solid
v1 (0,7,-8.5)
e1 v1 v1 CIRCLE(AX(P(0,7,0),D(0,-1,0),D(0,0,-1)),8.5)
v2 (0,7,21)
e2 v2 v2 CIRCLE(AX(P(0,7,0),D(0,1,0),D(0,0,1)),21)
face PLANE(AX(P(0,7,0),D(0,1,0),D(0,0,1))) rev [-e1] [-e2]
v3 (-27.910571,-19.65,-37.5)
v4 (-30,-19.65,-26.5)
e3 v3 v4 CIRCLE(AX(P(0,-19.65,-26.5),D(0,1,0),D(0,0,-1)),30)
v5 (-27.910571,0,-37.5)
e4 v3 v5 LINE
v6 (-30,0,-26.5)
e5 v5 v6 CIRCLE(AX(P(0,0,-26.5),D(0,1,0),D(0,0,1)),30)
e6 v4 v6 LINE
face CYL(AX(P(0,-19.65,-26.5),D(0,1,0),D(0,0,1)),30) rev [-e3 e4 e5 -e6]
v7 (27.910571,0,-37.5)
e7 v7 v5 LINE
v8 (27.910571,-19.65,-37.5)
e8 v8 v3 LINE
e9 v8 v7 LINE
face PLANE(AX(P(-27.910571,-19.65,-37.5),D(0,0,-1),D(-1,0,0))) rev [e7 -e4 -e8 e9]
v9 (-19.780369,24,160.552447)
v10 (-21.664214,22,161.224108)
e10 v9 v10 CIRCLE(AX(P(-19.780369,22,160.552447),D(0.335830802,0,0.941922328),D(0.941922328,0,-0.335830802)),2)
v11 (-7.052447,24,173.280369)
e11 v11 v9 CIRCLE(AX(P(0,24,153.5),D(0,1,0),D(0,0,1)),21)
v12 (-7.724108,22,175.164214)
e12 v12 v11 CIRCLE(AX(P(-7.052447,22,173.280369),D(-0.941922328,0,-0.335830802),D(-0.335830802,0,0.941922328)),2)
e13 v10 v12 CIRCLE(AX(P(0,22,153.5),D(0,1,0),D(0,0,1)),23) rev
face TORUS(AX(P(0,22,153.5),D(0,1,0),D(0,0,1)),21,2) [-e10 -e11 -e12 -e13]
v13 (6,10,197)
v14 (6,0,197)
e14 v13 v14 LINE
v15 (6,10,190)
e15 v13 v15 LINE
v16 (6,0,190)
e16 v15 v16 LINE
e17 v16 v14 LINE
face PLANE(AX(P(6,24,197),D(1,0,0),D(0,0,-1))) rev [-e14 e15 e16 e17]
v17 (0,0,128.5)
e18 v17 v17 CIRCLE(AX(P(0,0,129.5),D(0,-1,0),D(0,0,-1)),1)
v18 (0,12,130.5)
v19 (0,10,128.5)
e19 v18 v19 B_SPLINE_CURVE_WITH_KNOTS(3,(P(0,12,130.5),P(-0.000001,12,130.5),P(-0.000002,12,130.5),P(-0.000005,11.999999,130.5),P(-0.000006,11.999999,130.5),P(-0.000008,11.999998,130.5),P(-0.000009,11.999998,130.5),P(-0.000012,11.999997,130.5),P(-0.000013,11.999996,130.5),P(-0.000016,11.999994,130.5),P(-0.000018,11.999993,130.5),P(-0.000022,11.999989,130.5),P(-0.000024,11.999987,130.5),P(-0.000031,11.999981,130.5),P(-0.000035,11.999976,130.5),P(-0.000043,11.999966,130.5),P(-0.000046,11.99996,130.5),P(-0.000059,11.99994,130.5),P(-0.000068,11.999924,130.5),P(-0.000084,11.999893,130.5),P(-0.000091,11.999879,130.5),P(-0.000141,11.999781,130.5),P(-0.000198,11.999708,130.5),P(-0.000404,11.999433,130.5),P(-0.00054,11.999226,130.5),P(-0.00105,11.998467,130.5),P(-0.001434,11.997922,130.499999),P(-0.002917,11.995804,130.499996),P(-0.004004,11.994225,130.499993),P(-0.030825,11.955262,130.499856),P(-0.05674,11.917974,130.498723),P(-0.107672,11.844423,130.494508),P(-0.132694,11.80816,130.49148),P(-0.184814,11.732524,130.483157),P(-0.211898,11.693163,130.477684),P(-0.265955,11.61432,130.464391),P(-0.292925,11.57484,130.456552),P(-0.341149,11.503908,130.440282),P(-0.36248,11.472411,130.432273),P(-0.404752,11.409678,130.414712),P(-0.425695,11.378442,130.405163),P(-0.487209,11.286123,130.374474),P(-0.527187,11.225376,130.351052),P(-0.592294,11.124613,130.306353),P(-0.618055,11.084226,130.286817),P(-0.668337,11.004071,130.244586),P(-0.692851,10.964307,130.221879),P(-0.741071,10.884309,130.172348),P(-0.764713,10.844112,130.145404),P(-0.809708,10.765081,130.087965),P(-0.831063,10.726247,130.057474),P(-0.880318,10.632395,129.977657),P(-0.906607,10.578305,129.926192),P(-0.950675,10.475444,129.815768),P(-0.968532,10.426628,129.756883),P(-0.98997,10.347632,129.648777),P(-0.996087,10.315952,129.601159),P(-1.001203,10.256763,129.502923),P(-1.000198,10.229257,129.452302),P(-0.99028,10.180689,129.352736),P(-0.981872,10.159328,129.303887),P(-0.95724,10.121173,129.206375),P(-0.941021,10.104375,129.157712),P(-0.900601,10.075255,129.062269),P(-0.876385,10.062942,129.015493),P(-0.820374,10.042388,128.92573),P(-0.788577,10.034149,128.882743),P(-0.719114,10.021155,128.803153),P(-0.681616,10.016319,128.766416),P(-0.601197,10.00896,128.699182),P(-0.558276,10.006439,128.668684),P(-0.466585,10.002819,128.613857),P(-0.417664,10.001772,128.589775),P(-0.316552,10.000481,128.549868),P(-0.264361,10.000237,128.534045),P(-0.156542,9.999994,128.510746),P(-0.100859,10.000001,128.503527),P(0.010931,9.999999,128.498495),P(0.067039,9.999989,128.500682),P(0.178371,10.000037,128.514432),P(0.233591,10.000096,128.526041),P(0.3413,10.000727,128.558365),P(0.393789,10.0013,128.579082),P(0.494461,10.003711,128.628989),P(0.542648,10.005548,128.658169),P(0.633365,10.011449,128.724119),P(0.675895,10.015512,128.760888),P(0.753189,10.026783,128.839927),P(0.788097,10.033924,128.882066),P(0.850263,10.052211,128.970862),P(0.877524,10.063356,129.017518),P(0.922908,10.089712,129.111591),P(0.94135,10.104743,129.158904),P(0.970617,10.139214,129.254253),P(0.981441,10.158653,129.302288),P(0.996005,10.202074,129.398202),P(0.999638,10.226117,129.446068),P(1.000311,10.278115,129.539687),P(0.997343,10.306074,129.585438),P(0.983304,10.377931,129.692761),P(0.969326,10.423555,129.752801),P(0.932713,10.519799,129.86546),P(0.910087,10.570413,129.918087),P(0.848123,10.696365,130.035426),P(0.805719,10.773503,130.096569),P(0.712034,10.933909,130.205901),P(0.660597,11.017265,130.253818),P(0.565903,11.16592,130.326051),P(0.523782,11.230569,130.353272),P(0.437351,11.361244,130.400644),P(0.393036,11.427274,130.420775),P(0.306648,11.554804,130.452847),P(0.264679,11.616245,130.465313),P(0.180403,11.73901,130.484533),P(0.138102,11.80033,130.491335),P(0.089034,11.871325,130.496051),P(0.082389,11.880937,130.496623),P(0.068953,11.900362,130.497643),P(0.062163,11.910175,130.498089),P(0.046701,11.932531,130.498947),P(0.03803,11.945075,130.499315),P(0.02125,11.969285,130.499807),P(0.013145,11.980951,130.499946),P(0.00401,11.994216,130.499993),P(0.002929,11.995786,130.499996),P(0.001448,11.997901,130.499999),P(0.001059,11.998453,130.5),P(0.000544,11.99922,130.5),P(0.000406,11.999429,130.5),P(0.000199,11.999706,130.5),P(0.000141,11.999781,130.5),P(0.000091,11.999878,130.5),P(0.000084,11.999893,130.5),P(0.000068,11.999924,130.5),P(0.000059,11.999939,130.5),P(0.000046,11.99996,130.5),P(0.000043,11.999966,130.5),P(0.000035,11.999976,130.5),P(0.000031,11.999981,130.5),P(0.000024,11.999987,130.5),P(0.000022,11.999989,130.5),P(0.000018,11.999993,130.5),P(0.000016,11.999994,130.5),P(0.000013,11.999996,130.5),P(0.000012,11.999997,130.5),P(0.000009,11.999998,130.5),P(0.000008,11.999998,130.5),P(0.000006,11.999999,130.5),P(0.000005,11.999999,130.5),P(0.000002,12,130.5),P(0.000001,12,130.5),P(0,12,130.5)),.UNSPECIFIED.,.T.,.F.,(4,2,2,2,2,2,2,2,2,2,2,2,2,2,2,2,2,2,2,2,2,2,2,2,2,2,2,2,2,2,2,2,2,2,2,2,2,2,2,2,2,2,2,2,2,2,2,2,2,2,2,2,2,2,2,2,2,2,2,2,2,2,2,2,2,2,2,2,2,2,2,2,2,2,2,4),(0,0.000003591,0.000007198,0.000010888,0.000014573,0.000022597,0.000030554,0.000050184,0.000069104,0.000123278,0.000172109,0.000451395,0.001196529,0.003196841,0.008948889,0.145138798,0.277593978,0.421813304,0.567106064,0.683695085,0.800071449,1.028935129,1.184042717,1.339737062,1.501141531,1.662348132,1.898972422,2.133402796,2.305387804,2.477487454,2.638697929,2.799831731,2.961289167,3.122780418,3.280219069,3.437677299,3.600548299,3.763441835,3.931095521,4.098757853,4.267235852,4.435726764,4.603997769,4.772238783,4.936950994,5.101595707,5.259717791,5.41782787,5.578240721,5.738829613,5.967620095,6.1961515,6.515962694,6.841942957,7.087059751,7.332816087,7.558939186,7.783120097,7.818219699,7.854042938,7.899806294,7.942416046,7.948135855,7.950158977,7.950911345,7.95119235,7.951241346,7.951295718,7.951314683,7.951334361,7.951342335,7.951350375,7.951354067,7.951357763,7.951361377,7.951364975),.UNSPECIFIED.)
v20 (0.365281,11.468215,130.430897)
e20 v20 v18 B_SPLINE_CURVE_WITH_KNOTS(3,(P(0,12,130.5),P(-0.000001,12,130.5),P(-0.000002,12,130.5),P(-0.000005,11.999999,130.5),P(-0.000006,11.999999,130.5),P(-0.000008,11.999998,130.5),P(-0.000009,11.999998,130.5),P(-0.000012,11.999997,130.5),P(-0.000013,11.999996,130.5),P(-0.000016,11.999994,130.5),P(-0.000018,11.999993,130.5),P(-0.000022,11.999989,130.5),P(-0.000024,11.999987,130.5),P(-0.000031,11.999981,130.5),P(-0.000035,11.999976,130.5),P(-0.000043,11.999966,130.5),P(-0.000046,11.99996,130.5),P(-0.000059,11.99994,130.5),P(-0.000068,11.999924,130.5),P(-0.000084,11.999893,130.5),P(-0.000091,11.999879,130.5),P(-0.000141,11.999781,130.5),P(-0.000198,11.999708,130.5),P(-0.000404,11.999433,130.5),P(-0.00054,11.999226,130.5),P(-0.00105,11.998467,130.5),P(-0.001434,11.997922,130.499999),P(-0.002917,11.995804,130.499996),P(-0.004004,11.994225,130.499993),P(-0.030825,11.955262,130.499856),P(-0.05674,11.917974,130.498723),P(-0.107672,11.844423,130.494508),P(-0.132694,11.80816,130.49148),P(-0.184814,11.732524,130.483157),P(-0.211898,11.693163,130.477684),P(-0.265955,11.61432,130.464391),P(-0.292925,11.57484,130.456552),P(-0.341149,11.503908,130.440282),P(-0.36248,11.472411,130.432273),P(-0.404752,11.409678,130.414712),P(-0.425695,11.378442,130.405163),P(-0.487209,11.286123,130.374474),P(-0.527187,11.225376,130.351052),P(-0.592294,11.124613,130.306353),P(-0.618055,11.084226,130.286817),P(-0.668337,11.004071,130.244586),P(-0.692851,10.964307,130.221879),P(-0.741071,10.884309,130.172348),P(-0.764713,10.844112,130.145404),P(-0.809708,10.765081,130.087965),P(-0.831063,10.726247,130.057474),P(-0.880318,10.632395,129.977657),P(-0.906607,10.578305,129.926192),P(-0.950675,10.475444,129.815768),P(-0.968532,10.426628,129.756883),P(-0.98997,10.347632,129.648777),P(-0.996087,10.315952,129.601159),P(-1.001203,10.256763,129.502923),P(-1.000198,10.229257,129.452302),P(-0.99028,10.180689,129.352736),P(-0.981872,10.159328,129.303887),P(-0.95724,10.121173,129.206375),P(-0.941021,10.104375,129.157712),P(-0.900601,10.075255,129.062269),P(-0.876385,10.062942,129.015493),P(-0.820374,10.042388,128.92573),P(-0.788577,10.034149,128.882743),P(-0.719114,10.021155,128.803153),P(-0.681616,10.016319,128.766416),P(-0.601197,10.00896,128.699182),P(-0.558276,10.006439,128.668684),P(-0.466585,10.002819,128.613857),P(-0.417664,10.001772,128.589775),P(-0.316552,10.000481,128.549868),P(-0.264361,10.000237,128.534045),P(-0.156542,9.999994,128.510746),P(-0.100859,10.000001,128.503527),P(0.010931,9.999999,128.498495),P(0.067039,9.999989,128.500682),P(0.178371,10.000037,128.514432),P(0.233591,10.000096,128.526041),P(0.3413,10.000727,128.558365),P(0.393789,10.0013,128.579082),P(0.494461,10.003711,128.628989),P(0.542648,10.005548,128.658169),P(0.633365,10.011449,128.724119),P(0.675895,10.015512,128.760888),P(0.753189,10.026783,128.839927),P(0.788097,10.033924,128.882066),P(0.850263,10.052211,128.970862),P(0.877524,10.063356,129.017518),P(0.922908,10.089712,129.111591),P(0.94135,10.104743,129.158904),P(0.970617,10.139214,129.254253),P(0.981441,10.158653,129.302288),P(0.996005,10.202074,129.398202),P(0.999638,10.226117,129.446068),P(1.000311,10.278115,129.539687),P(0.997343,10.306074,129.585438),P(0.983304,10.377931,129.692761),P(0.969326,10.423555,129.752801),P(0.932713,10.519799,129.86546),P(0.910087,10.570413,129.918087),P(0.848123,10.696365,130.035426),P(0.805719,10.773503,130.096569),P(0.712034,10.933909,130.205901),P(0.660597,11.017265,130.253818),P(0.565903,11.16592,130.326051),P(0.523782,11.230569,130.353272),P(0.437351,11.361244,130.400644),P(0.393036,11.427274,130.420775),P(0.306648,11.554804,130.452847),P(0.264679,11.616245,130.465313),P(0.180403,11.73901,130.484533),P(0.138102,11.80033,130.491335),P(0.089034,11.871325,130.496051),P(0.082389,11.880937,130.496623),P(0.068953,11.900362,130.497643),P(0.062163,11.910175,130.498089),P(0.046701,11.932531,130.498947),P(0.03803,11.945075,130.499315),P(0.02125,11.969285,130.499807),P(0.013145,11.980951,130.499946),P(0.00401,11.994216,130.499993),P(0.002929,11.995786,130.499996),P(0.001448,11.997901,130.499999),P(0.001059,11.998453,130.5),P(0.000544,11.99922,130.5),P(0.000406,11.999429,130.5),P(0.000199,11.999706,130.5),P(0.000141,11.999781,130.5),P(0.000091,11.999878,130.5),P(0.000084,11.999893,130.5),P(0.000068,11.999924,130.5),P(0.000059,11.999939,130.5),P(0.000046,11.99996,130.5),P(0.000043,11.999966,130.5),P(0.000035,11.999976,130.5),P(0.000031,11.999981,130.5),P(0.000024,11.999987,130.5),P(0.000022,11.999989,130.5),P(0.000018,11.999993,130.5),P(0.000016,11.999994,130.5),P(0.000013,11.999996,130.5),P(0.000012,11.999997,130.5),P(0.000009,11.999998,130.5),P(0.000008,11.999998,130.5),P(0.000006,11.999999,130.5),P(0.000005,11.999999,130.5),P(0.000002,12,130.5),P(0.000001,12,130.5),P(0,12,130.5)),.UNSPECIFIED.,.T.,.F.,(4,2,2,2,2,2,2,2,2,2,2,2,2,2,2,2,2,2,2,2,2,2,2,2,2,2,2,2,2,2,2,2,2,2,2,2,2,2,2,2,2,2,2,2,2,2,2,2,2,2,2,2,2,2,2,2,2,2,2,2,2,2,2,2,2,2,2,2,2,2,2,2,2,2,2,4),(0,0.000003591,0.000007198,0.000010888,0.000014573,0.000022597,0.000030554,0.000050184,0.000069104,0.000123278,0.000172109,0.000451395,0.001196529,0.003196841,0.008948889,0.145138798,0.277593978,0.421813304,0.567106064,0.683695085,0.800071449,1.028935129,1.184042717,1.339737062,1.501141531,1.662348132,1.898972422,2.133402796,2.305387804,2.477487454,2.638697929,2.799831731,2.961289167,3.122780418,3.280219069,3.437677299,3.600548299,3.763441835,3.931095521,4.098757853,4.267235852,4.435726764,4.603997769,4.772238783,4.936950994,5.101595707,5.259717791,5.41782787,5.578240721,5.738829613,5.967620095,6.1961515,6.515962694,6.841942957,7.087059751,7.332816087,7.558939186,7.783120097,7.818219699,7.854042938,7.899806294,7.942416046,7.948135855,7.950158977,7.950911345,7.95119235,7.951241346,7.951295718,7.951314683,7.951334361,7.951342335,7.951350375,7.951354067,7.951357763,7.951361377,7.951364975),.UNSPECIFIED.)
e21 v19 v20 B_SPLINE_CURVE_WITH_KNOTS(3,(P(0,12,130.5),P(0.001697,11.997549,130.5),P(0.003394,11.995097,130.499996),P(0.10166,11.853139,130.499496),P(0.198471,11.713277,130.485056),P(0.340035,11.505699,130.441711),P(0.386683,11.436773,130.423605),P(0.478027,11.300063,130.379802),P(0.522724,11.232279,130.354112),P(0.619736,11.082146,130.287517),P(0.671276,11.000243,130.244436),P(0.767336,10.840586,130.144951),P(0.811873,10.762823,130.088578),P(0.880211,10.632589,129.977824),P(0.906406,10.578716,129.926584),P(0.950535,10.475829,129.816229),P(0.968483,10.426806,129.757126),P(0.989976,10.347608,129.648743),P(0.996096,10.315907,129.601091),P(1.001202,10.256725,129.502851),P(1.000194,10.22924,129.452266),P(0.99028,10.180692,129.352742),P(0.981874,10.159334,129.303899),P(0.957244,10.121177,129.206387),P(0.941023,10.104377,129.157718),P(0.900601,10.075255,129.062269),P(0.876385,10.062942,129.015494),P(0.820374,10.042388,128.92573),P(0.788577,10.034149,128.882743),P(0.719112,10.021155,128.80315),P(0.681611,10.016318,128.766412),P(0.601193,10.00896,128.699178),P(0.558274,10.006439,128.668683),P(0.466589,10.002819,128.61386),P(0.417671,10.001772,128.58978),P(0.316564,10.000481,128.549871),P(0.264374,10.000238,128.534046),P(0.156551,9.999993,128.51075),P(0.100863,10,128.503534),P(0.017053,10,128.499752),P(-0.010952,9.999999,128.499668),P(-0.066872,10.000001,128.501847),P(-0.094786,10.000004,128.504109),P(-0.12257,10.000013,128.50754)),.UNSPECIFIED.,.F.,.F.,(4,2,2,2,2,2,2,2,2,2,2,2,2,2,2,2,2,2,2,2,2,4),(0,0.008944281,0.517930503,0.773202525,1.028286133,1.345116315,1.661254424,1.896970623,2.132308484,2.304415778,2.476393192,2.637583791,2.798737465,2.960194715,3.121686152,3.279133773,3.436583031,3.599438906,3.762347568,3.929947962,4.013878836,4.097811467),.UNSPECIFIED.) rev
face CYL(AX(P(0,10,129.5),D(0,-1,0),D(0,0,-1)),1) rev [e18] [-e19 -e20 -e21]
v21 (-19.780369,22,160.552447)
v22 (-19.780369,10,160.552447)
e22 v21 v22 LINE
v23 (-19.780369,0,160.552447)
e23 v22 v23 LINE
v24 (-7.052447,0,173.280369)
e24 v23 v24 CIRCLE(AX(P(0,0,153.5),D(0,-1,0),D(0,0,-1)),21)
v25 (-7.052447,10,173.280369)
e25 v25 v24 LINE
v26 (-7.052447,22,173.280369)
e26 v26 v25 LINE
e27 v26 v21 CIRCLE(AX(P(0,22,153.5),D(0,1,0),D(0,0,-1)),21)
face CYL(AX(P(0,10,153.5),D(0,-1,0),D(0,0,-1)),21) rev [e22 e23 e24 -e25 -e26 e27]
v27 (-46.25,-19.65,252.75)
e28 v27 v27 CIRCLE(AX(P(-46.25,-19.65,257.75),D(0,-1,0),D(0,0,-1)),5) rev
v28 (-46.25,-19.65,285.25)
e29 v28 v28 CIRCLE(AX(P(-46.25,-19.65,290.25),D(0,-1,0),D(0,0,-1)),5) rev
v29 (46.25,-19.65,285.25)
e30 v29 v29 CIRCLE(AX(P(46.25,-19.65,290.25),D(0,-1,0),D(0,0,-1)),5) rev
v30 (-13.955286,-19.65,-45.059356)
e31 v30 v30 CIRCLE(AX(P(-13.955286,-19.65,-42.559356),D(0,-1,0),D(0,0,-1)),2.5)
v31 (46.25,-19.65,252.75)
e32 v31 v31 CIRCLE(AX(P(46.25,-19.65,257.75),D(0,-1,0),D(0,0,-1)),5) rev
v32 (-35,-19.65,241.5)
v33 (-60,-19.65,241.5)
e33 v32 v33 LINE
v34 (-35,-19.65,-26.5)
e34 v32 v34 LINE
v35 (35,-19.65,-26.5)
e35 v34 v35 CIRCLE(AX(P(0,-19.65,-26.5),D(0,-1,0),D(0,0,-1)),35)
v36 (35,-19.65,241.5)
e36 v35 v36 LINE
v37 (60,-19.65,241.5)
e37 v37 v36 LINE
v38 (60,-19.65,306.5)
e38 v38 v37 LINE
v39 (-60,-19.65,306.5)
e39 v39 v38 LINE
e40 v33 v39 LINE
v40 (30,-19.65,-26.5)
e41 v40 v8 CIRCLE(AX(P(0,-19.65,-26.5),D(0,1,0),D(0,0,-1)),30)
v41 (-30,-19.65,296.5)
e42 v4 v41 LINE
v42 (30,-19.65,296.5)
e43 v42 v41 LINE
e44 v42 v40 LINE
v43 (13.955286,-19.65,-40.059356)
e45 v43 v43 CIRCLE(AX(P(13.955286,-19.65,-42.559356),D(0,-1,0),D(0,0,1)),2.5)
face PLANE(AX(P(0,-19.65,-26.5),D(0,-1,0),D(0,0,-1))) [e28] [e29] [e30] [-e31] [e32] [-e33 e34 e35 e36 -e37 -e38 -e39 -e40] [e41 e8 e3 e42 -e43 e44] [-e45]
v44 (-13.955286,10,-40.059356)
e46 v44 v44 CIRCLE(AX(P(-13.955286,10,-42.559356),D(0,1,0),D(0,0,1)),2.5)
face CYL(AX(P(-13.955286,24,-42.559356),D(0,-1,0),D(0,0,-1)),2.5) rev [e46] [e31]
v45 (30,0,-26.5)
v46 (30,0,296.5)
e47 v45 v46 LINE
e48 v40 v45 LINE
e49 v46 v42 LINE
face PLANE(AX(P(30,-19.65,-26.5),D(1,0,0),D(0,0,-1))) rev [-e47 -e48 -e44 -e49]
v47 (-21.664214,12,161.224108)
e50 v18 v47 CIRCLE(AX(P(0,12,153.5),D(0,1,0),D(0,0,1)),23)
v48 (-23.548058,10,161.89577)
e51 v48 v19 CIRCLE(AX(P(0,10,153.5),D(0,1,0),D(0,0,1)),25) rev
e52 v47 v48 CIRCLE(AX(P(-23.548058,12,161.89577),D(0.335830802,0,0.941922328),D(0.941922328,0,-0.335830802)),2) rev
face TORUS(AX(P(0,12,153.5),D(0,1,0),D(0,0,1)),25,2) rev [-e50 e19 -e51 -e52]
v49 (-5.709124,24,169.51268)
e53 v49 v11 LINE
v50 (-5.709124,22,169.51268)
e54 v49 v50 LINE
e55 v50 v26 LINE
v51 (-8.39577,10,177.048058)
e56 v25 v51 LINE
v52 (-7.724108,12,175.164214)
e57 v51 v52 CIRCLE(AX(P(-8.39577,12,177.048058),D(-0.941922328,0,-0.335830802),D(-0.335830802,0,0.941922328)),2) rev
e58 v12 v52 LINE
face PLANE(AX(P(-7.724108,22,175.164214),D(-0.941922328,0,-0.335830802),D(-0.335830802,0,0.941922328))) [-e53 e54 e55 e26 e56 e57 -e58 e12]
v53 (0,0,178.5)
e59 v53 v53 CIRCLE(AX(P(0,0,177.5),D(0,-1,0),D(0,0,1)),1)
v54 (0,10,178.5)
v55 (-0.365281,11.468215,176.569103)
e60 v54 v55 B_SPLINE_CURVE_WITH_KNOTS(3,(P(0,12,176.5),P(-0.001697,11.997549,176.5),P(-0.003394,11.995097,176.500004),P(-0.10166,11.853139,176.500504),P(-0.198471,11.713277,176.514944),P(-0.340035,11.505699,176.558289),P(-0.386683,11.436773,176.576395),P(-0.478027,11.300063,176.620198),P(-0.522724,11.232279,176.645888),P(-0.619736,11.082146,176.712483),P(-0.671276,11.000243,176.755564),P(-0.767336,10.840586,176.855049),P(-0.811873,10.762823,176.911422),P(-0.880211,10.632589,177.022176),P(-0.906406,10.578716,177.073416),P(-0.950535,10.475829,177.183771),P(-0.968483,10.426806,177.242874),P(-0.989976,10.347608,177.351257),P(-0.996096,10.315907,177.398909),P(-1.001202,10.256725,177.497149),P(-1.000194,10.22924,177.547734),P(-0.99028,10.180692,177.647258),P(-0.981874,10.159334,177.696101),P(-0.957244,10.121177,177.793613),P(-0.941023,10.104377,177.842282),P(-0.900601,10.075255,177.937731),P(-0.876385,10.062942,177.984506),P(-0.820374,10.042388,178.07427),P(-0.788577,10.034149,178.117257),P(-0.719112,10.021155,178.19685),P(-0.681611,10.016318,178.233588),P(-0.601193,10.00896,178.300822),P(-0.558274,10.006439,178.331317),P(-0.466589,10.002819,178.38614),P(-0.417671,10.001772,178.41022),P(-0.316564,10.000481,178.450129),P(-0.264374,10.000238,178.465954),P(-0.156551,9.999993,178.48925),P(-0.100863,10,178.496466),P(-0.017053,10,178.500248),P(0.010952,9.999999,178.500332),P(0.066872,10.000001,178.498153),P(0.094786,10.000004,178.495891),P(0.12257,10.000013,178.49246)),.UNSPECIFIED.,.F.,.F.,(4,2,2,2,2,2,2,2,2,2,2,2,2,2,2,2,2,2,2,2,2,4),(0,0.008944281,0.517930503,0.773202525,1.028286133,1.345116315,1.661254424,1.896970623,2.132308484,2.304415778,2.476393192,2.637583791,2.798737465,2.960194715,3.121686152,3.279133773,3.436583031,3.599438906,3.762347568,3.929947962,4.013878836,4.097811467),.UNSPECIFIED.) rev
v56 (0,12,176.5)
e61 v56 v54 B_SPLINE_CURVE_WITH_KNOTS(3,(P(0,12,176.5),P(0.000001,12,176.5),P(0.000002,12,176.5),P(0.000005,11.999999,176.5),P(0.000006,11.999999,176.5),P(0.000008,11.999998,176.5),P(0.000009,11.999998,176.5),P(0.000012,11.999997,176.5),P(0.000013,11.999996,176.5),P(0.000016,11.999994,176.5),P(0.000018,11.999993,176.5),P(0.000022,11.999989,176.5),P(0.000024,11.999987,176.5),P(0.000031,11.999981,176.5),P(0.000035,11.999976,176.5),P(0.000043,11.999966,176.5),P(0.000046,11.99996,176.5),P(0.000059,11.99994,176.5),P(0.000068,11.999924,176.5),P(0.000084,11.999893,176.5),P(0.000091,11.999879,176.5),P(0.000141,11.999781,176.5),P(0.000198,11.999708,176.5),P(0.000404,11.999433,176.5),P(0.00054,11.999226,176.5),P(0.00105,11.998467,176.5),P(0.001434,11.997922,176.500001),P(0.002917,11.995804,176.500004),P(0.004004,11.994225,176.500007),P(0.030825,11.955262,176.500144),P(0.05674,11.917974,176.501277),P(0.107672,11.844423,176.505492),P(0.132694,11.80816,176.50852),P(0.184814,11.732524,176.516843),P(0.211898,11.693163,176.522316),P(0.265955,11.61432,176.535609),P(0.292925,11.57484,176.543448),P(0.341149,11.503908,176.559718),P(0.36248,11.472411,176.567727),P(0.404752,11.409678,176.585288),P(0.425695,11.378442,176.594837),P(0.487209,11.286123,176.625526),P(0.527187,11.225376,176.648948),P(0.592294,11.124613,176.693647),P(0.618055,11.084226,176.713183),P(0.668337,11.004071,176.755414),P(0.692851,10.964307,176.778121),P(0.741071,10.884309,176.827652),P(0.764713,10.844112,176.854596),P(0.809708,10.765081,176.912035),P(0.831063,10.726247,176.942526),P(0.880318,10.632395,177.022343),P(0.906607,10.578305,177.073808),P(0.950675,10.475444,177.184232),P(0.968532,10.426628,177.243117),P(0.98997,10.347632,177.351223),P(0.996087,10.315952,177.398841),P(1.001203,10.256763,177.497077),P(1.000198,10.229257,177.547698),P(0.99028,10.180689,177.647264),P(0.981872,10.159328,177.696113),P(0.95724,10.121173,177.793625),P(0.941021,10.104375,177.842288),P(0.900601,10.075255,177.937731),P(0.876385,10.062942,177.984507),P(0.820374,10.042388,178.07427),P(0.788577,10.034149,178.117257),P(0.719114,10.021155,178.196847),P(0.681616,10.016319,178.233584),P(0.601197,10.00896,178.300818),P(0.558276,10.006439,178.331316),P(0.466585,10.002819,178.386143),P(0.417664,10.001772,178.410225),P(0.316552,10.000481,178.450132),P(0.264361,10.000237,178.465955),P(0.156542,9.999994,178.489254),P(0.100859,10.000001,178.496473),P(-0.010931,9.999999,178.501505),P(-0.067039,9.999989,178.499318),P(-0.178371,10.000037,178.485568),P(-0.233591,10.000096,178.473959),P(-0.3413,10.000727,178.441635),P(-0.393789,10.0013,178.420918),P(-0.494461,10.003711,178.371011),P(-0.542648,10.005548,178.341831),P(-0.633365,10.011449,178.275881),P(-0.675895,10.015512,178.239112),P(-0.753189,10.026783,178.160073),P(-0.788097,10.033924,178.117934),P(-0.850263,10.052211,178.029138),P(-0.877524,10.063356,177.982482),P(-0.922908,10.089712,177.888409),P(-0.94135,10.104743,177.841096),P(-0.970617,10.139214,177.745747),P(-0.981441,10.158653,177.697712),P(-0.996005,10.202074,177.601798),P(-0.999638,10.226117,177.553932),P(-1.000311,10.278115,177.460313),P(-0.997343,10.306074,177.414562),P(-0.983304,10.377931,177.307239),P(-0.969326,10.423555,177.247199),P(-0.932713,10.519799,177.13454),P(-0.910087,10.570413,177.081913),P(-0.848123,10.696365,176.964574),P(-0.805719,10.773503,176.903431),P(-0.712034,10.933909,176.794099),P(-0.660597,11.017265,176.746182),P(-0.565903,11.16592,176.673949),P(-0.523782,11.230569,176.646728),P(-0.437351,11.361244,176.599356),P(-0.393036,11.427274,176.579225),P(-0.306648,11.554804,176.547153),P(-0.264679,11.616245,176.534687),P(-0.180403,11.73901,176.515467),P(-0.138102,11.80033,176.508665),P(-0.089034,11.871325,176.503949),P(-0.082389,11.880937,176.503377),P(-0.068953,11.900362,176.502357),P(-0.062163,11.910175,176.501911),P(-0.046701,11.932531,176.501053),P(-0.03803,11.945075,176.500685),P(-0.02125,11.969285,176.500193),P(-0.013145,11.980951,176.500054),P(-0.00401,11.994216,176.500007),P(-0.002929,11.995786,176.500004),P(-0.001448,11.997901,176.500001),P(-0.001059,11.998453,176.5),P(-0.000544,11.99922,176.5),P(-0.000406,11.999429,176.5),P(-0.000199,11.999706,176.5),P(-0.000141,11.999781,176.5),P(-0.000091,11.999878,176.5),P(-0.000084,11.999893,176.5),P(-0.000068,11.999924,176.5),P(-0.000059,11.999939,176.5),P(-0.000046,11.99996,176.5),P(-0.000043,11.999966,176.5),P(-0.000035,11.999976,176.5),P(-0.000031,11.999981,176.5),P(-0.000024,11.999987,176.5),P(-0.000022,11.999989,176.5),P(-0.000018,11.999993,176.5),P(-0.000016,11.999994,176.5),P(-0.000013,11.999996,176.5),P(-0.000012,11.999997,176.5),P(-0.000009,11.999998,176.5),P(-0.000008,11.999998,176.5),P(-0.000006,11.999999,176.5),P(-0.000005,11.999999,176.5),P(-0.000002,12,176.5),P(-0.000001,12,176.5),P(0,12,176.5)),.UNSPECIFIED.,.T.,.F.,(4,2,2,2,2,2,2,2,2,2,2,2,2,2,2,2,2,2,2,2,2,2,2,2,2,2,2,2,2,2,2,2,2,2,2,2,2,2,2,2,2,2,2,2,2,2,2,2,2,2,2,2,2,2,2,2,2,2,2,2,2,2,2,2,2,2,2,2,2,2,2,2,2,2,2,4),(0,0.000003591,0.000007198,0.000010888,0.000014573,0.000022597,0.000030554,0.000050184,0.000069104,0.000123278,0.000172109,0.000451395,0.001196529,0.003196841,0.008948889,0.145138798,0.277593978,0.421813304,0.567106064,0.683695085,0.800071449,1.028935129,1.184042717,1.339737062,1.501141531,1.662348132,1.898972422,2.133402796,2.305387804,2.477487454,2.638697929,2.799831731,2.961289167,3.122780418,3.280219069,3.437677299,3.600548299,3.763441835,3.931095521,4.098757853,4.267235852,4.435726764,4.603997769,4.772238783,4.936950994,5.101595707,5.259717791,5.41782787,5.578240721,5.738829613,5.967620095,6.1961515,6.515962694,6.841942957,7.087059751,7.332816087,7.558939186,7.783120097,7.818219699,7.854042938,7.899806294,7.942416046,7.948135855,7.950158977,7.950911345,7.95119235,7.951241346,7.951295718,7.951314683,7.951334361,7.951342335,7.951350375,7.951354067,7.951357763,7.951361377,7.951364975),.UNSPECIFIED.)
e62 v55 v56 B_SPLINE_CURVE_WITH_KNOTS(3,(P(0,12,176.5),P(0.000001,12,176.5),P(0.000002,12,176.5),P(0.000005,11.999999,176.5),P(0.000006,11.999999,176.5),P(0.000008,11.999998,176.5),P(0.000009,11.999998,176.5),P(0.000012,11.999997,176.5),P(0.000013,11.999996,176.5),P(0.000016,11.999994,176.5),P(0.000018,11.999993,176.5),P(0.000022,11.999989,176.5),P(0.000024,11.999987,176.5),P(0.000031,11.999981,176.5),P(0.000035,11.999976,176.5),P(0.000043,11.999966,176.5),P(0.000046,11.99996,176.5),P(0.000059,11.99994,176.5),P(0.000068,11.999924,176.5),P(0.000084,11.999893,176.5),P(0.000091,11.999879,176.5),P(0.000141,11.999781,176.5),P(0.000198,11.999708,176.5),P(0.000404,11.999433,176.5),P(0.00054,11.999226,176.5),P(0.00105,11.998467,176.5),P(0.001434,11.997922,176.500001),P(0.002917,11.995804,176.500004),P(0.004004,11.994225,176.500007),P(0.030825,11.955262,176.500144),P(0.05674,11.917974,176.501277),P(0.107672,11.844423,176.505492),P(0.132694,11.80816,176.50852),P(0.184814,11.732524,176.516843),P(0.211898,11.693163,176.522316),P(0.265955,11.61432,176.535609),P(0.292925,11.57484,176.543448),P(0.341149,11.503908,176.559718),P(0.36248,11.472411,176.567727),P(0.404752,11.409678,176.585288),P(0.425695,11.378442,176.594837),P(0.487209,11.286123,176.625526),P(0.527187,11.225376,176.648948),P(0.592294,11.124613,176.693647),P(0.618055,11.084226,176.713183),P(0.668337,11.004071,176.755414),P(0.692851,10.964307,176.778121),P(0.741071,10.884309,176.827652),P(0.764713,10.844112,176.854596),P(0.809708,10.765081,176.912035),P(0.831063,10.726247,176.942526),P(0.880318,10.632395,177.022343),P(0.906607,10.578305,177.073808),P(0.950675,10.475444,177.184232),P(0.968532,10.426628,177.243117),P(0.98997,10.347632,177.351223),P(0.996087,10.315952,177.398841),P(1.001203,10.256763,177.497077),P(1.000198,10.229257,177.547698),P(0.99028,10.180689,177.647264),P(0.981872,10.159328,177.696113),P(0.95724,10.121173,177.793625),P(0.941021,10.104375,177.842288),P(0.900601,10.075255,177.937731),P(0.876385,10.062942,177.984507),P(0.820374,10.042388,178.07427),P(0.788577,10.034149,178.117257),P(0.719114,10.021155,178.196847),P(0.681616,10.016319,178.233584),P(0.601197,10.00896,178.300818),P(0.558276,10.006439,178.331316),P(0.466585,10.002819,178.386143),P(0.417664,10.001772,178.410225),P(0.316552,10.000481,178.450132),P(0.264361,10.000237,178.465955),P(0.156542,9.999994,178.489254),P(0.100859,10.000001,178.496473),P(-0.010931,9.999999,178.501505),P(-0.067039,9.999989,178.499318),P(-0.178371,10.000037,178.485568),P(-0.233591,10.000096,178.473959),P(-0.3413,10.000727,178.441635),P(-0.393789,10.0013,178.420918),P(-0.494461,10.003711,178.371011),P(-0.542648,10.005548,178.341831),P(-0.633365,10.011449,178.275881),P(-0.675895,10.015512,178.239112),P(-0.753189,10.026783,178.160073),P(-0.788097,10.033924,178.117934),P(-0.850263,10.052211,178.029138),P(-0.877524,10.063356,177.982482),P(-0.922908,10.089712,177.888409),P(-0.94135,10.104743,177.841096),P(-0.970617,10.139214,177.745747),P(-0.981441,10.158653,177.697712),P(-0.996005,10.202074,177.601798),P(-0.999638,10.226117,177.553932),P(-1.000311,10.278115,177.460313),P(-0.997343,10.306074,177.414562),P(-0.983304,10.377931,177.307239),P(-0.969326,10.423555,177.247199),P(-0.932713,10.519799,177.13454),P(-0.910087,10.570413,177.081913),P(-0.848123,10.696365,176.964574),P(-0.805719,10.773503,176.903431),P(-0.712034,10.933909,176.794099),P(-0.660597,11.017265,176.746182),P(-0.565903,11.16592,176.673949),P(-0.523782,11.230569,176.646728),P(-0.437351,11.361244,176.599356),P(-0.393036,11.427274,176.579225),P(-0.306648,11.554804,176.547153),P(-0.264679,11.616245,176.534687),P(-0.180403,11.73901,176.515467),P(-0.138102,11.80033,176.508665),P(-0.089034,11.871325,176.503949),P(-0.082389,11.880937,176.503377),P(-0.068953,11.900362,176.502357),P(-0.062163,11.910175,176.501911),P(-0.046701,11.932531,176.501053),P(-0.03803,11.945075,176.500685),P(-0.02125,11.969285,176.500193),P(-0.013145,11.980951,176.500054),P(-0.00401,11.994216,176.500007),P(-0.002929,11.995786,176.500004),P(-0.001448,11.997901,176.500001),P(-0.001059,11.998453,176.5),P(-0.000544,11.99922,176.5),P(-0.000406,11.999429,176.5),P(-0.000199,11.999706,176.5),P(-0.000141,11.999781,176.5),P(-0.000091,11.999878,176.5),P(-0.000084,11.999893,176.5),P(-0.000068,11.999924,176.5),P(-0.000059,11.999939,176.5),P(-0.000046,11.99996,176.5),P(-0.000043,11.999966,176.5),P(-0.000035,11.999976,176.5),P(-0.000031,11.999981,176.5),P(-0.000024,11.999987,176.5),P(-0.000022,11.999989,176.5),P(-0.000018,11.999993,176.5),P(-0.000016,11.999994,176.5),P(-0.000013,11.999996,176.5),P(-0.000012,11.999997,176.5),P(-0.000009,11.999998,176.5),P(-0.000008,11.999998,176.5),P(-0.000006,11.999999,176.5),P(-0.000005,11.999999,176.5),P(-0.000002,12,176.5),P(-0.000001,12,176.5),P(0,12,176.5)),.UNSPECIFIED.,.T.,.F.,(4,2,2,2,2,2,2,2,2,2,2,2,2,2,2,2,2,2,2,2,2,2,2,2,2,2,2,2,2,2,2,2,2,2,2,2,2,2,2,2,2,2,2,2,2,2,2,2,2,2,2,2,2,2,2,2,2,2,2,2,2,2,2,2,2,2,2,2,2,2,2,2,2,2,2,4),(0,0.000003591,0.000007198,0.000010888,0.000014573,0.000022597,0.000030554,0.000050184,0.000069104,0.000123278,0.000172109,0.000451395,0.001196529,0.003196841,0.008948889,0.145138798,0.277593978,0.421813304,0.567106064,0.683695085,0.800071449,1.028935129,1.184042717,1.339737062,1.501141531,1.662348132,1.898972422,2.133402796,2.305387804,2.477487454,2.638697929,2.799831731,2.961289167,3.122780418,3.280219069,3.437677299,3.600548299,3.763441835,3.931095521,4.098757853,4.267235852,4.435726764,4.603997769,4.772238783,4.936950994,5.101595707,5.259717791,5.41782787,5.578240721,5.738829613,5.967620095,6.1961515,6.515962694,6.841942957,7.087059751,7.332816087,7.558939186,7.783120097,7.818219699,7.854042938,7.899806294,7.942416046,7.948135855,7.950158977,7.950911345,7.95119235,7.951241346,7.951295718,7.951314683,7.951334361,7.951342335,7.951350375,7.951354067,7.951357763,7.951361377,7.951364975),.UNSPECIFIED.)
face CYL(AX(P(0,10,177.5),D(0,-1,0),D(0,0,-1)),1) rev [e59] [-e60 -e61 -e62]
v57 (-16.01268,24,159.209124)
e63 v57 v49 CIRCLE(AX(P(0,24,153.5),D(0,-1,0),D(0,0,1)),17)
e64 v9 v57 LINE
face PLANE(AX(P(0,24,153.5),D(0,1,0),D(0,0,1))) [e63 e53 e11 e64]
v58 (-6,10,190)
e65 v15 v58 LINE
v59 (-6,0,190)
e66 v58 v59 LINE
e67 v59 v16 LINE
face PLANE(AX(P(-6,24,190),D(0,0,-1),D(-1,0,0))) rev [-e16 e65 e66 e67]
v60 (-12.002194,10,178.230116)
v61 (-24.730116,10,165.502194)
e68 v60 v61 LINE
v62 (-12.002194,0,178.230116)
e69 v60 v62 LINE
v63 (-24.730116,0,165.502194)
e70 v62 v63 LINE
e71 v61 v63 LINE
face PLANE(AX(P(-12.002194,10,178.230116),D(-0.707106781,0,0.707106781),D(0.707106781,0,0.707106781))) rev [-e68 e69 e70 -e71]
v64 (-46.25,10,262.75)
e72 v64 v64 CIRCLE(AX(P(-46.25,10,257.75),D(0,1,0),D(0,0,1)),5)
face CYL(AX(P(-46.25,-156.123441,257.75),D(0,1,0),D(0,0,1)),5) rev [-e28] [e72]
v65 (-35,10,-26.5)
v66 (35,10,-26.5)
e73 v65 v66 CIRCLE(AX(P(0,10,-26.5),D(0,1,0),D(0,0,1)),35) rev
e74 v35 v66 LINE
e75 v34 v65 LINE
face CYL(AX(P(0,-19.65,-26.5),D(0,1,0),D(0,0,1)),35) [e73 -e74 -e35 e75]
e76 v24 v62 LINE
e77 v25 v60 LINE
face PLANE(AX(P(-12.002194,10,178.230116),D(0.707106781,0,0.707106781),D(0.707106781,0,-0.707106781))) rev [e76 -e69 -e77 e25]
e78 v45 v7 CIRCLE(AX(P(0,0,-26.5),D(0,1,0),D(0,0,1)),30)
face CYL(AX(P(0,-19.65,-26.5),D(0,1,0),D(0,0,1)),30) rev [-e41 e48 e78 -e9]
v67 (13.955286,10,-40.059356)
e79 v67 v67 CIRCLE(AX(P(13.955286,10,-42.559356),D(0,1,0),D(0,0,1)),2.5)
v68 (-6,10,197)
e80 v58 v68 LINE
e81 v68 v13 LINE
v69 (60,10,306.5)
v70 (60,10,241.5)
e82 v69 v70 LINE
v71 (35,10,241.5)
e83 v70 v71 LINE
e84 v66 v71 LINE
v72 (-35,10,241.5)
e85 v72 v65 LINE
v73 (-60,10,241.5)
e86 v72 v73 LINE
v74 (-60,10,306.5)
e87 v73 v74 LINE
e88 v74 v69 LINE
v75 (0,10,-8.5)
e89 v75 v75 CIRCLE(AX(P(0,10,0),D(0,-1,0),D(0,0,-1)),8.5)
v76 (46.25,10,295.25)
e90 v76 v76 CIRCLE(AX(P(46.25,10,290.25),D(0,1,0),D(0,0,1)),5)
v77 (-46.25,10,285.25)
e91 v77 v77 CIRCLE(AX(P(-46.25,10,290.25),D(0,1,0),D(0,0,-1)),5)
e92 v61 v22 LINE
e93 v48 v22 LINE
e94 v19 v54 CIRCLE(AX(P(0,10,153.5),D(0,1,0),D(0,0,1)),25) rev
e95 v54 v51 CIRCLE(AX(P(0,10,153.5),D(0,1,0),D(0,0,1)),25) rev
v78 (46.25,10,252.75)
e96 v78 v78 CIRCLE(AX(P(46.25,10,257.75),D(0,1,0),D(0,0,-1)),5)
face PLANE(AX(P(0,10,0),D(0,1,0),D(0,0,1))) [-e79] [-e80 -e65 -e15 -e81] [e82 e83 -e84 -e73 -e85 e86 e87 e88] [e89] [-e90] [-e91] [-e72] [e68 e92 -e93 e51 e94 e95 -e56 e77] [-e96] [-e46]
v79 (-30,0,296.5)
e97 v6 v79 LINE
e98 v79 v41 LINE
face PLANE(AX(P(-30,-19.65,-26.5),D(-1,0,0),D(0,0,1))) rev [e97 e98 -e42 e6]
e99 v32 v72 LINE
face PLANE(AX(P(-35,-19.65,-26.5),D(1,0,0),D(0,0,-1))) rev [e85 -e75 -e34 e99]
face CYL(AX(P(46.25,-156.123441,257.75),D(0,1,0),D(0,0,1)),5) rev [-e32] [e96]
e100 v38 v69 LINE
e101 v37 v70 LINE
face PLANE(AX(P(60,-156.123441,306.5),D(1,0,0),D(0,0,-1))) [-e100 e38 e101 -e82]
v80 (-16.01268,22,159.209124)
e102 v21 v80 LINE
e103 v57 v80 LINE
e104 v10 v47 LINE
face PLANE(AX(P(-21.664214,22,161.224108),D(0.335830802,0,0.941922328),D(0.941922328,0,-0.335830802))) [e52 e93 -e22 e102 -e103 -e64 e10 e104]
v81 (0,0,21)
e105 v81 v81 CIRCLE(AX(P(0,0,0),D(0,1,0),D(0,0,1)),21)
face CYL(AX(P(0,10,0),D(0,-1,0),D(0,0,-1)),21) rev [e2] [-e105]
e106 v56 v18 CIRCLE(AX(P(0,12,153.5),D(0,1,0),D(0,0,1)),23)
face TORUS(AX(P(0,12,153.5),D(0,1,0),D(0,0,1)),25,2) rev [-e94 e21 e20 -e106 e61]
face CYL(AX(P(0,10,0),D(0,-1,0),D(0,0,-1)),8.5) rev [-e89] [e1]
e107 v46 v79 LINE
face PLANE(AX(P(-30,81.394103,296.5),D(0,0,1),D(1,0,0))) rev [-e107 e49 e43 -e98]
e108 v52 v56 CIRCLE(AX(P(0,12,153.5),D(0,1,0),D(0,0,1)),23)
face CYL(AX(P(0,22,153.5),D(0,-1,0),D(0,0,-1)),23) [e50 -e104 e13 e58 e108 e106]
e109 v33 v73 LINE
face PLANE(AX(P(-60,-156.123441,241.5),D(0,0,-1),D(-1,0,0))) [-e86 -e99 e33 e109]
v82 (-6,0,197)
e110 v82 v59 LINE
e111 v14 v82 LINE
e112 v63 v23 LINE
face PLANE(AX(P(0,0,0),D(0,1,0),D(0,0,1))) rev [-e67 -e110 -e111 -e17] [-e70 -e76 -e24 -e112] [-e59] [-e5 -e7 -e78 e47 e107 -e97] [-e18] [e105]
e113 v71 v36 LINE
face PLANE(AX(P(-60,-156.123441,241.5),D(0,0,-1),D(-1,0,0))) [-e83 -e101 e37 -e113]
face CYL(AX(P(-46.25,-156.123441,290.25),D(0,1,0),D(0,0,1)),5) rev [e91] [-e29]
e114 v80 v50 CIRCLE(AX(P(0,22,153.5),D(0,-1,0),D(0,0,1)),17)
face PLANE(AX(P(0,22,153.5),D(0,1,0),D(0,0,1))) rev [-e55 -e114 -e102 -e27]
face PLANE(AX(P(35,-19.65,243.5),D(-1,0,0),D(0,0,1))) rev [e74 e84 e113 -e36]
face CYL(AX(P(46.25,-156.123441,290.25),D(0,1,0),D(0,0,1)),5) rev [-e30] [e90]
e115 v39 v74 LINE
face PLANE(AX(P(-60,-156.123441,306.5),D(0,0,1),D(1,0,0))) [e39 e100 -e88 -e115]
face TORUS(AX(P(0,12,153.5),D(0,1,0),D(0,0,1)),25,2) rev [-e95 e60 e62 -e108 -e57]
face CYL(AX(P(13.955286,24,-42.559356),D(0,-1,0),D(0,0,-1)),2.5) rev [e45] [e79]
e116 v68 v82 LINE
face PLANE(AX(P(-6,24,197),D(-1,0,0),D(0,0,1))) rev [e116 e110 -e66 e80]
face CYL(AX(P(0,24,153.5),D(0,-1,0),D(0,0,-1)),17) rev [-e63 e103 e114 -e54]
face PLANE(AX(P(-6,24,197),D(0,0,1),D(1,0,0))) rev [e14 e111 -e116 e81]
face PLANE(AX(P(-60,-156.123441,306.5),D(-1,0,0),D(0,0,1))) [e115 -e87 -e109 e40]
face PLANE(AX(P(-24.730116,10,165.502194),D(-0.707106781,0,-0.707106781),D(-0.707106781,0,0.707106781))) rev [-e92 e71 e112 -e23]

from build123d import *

# Parameters (mm, degrees)
BOSS_EXTRUDE1_DEPTH = 10
BOSS_EXTRUDE2_START = -3
SKETCH2_R           = 3.5
SKETCH2_R_2         = 7.5
BOSS_EXTRUDE2_DEPTH = 3
BOSS_EXTRUDE5_START = -3
BOSS_EXTRUDE5_DEPTH = 10
SKETCH6_R           = 8.5
CUT_EXTRUDE1_DEPTH  = 246.440929757
SKETCH7_R           = 1
CUT_EXTRUDE2_DEPTH  = 246.544802429
BOSS_EXTRUDE6_DEPTH = 22
BOSS_EXTRUDE7_DEPTH = 2
FILLET1_R           = 2
FILLET3_R           = 2
SKETCH11_W          = 12
SKETCH11_H          = 7
CUT_EXTRUDE3_DEPTH  = 247.512170095
BOSS_EXTRUDE8_START = -10
BOSS_EXTRUDE8_DEPTH = 29.65
SKETCH13_R          = 2.5
CUT_EXTRUDE4_DEPTH  = 250.845097028
SKETCH14_W          = 120
SKETCH14_H          = 65
SKETCH14_R          = 5
BOSS_EXTRUDE9_DEPTH = 29.65
SKETCH15_W          = 60
SKETCH15_H          = 55
CUT_EXTRUDE5_DEPTH  = 19.65


with BuildPart() as part:
    # Sketch1 → Boss-Extrude1 (new body)
    with BuildSketch(Plane(origin=(0, 0, 0), x_dir=(1, 0, 0), z_dir=(0, 1, 0))):
        with BuildLine():
            Line((30, 26.5), (30, -243.5))
            Line((30, -243.5), (-30, -243.5))
            Line((-30, -243.5), (-30, 26.5))
            ThreePointArc((-30, 26.5), (0, 56.5), (30, 26.5))
        make_face()
        with BuildLine():
            ThreePointArc((11.477382224, -17.586065429), (21, 0), (11.477382224, 17.586065429))
            Line((11.477382224, 17.586065429), (5.68518373, 33.5))
            Line((5.68518373, 33.5), (-5.68518373, 33.5))
            Line((-5.68518373, 33.5), (-11.477382224, 17.586065429))
            ThreePointArc((-11.477382224, 17.586065429), (-21, 0), (-11.477382224, -17.586065429))
            Line((-11.477382224, -17.586065429), (-5.68518373, -33.5))
            Line((-5.68518373, -33.5), (5.68518373, -33.5))
            Line((5.68518373, -33.5), (11.477382224, -17.586065429))
        make_face(mode=Mode.SUBTRACT)
    extrude(amount=BOSS_EXTRUDE1_DEPTH)

    # Sketch2 → Boss-Extrude2 (add)
    with BuildSketch(Plane(origin=(0, 10, 0), x_dir=(1, 0, 0), z_dir=(0, 1, 0)).offset(BOSS_EXTRUDE2_START)):
        with BuildLine():
            Line((5.68518373, 33.5), (11.477382224, 17.586065429))
            ThreePointArc((11.477382224, 17.586065429), (21, 0), (11.477382224, -17.586065429))
            Line((11.477382224, -17.586065429), (5.68518373, -33.5))
            Line((5.68518373, -33.5), (-5.68518373, -33.5))
            Line((-5.68518373, -33.5), (-11.477382224, -17.586065429))
            ThreePointArc((-11.477382224, -17.586065429), (-21, 0), (-11.477382224, 17.586065429))
            Line((-11.477382224, 17.586065429), (-5.68518373, 33.5))
            Line((-5.68518373, 33.5), (5.68518373, 33.5))
        make_face()
        with Locations(Location((0, 26.5, 0), (0, 0, 270))):
            Circle(SKETCH2_R, mode=Mode.SUBTRACT)
        with Locations(Location((0, -26.5, 0), (0, 0, 90))):
            Circle(SKETCH2_R, mode=Mode.SUBTRACT)
        with Locations(Location((0, 0, 0), (0, 0, 270))):
            Circle(SKETCH2_R_2, mode=Mode.SUBTRACT)
    extrude(amount=BOSS_EXTRUDE2_DEPTH)

    # Sketch5 → Boss-Extrude5 (add)
    with BuildSketch(Plane.XZ.offset(-7).offset(BOSS_EXTRUDE5_START)):
        with BuildLine():
            Line((11.477382224, -17.586065429), (5.68518373, -33.5))
            Line((5.68518373, -33.5), (-5.68518373, -33.5))
            Line((-5.68518373, -33.5), (-11.477382224, -17.586065429))
            ThreePointArc((-11.477382224, -17.586065429), (0, -21), (11.477382224, -17.586065429))
        make_face()
        with BuildLine():
            Line((5.68518373, 33.5), (11.477382224, 17.586065429))
            ThreePointArc((11.477382224, 17.586065429), (0, 21), (-11.477382224, 17.586065429))
            Line((-11.477382224, 17.586065429), (-5.68518373, 33.5))
            Line((-5.68518373, 33.5), (5.68518373, 33.5))
        make_face()
    extrude(amount=BOSS_EXTRUDE5_DEPTH)

    # Sketch6 → Cut-Extrude1 (cut, through all)
    with BuildSketch(Plane.XZ.offset(-7)):
        with Locations(Location((0, 0, 0), (0, 0, 270))):
            Circle(SKETCH6_R)
    extrude(amount=-CUT_EXTRUDE1_DEPTH, mode=Mode.SUBTRACT)

    # Sketch7 → Cut-Extrude2 (cut, through all)
    with BuildSketch(Plane.XZ):
        with Locations(Location((0, 129.5, 0), (0, 0, 270))):
            Circle(SKETCH7_R)
        with Locations(Location((0, 177.5, 0), (0, 0, 90))):
            Circle(SKETCH7_R)
        with BuildLine():
            Line((-12.002194303, 178.230116364), (-24.730116364, 165.502194303))
            Line((-24.730116364, 165.502194303), (-19.780368896, 160.552446834))
            ThreePointArc((-19.780368896, 160.552446834), (14.849242405, 138.650757595), (-7.052446834, 173.280368896))
            Line((-7.052446834, 173.280368896), (-12.002194303, 178.230116364))
        make_face()
    extrude(amount=-CUT_EXTRUDE2_DEPTH, mode=Mode.SUBTRACT)

    # Sketch9 → Boss-Extrude6 (add)
    with BuildSketch(Plane.XZ):
        with BuildLine():
            Line((-21.664213552, 161.224108438), (-19.780368896, 160.552446834))
            ThreePointArc((-19.780368896, 160.552446834), (14.849242405, 138.650757595), (-7.052446834, 173.280368896))
            Line((-7.052446834, 173.280368896), (-7.724108438, 175.164213552))
            ThreePointArc((-7.724108438, 175.164213552), (16.263455967, 137.236544033), (-21.664213552, 161.224108438))
        make_face()
    extrude(amount=-BOSS_EXTRUDE6_DEPTH)

    # Sketch10 → Boss-Extrude7 (add)
    with BuildSketch(Plane(origin=(0, 22, 0), x_dir=(1, 0, 0), z_dir=(0, 1, 0))):
        with BuildLine():
            Line((-21.664213552, -161.224108438), (-16.012679582, -159.209123628))
            ThreePointArc((-16.012679582, -159.209123628), (12.02081528, -141.47918472), (-5.709123628, -169.512679582))
            Line((-5.709123628, -169.512679582), (-7.724108438, -175.164213552))
            ThreePointArc((-7.724108438, -175.164213552), (16.263455967, -137.236544033), (-21.664213552, -161.224108438))
        make_face()
    extrude(amount=BOSS_EXTRUDE7_DEPTH)

    # Fillet1
    fillet1_edges = [part.edges().sort_by_distance(p)[0] for p in [
        (16.263455967, 24, 137.236544033),
    ]]
    fillet(fillet1_edges, radius=FILLET1_R)

    # Fillet3
    # the kernel refuses this fillet: 2 mm, written as the material it adds along each edge
    with BuildSketch(Plane(origin=(0, 10, 153.5), x_dir=(-2.3359514129780358e-09, 0, 1.0), z_dir=(1.0, 0, 2.3359514129780358e-09))) as fillet3_piece_1_section:
        with BuildLine():
            CenterArc((23 + FILLET3_R, -FILLET3_R), FILLET3_R, 90, 90)
            Line((23 + FILLET3_R, 0), (23, 0))
            Line((23, 0), (23, -FILLET3_R))
        make_face()
    fillet3_piece_1 = revolve(axis=Axis((0, 10, 153.5), (0, -1, 0)), revolution_arc=19.623066341, mode=Mode.PRIVATE)
    fillet3_piece_1 = fillet3_piece_1 - Plane(origin=(0, 10.450783466, 177.5), x_dir=(0, 0, 1), z_dir=(0, -1, 0)) * Cylinder(1, 101, mode=Mode.PRIVATE)
    add(fillet3_piece_1)
    with BuildSketch(Plane(origin=(0, 10, 153.5), x_dir=(-0.9419223283656014, 0, 0.3358308016342816), z_dir=(0.3358308016342816, 0, 0.9419223283656014))) as fillet3_piece_2_section:
        with BuildLine():
            CenterArc((23 + FILLET3_R, -FILLET3_R), FILLET3_R, 90, 90)
            Line((23 + FILLET3_R, 0), (23, 0))
            Line((23, 0), (23, -FILLET3_R))
        make_face()
    fillet3_piece_2 = revolve(axis=Axis((0, 10, 153.5), (0, -1, 0)), revolution_arc=109.623066475, mode=Mode.PRIVATE)
    fillet3_piece_2 = fillet3_piece_2 - Plane(origin=(0, 10.562032205, 129.5), x_dir=(0, 0, -1), z_dir=(0, -1, 0)) * Cylinder(1, 101, mode=Mode.PRIVATE)
    add(fillet3_piece_2)
    with BuildSketch(Plane(origin=(0, 10, 153.5), x_dir=(0, 0, -1), z_dir=(-1, 0, 0))) as fillet3_piece_3_section:
        with BuildLine():
            CenterArc((23 + FILLET3_R, -FILLET3_R), FILLET3_R, 90, 90)
            Line((23 + FILLET3_R, 0), (23, 0))
            Line((23, 0), (23, -FILLET3_R))
        make_face()
    fillet3_piece_3 = revolve(axis=Axis((0, 10, 153.5), (0, -1, 0)), revolution_arc=180.000000134, mode=Mode.PRIVATE)
    fillet3_piece_3 = fillet3_piece_3 - Plane(origin=(0, 10.557784065, 177.5), x_dir=(0, 0, 1), z_dir=(0, -1, 0)) * Cylinder(1, 101, mode=Mode.PRIVATE)
    fillet3_piece_3 = fillet3_piece_3 - Plane(origin=(0, 10.557784065, 129.5), x_dir=(0, 0, -1), z_dir=(0, -1, 0)) * Cylinder(1, 101, mode=Mode.PRIVATE)
    add(fillet3_piece_3)

    # Sketch11 → Cut-Extrude3 (cut, through all)
    with BuildSketch(Plane.XZ):
        with Locations((0, 193.5)):
            Rectangle(SKETCH11_W, SKETCH11_H)
    extrude(amount=-CUT_EXTRUDE3_DEPTH, mode=Mode.SUBTRACT)

    # Sketch12 → Boss-Extrude8 (add)
    with BuildSketch(Plane.XZ.offset(BOSS_EXTRUDE8_START)):
        with BuildLine():
            Line((35, 243.5), (35, -26.5))
            ThreePointArc((35, -26.5), (0, -61.5), (-35, -26.5))
            Line((-35, -26.5), (-35, 243.5))
            Line((-35, 243.5), (-30, 243.5))
            Line((-30, 243.5), (-30, -26.5))
            ThreePointArc((-30, -26.5), (-29.473014303, -32.09834153), (-27.910571474, -37.5))
            Line((-27.910571474, -37.5), (27.910571474, -37.5))
            ThreePointArc((27.910571474, -37.5), (29.473014303, -32.09834153), (30, -26.5))
            Line((30, -26.5), (30, 243.5))
            Line((30, 243.5), (35, 243.5))
        make_face()
    extrude(amount=BOSS_EXTRUDE8_DEPTH)

    # Sketch13 → Cut-Extrude4 (cut, through all)
    with BuildSketch(Plane.XZ.offset(19.65)):
        with Locations(Location((-13.955285737, -42.559356041, 0), (0, 0, 270))):
            Circle(SKETCH13_R)
        with Locations(Location((13.955285737, -42.559356041, 0), (0, 0, 90))):
            Circle(SKETCH13_R)
    extrude(amount=-CUT_EXTRUDE4_DEPTH, mode=Mode.SUBTRACT)

    # Sketch14 → Boss-Extrude9 (add)
    with BuildSketch(Plane(origin=(0, 10, 0), x_dir=(1, 0, 0), z_dir=(0, 1, 0))):
        with Locations((0, -274)):
            Rectangle(SKETCH14_W, SKETCH14_H)
        with Locations(Location((46.25, -290.25, 0), (0, 0, 270))):
            Circle(SKETCH14_R, mode=Mode.SUBTRACT)
        with Locations(Location((-46.25, -290.25, 0), (0, 0, 90))):
            Circle(SKETCH14_R, mode=Mode.SUBTRACT)
        with Locations(Location((46.25, -257.75, 0), (0, 0, 90))):
            Circle(SKETCH14_R, mode=Mode.SUBTRACT)
        with Locations(Location((-46.25, -257.75, 0), (0, 0, 270))):
            Circle(SKETCH14_R, mode=Mode.SUBTRACT)
    extrude(amount=-BOSS_EXTRUDE9_DEPTH)

    # Sketch15 → Cut-Extrude5 (cut)
    with BuildSketch(Plane.XZ.offset(19.65)):
        with Locations((0, 269)):
            Rectangle(SKETCH15_W, SKETCH15_H)
    extrude(amount=-CUT_EXTRUDE5_DEPTH, mode=Mode.SUBTRACT)


solid = part.part
